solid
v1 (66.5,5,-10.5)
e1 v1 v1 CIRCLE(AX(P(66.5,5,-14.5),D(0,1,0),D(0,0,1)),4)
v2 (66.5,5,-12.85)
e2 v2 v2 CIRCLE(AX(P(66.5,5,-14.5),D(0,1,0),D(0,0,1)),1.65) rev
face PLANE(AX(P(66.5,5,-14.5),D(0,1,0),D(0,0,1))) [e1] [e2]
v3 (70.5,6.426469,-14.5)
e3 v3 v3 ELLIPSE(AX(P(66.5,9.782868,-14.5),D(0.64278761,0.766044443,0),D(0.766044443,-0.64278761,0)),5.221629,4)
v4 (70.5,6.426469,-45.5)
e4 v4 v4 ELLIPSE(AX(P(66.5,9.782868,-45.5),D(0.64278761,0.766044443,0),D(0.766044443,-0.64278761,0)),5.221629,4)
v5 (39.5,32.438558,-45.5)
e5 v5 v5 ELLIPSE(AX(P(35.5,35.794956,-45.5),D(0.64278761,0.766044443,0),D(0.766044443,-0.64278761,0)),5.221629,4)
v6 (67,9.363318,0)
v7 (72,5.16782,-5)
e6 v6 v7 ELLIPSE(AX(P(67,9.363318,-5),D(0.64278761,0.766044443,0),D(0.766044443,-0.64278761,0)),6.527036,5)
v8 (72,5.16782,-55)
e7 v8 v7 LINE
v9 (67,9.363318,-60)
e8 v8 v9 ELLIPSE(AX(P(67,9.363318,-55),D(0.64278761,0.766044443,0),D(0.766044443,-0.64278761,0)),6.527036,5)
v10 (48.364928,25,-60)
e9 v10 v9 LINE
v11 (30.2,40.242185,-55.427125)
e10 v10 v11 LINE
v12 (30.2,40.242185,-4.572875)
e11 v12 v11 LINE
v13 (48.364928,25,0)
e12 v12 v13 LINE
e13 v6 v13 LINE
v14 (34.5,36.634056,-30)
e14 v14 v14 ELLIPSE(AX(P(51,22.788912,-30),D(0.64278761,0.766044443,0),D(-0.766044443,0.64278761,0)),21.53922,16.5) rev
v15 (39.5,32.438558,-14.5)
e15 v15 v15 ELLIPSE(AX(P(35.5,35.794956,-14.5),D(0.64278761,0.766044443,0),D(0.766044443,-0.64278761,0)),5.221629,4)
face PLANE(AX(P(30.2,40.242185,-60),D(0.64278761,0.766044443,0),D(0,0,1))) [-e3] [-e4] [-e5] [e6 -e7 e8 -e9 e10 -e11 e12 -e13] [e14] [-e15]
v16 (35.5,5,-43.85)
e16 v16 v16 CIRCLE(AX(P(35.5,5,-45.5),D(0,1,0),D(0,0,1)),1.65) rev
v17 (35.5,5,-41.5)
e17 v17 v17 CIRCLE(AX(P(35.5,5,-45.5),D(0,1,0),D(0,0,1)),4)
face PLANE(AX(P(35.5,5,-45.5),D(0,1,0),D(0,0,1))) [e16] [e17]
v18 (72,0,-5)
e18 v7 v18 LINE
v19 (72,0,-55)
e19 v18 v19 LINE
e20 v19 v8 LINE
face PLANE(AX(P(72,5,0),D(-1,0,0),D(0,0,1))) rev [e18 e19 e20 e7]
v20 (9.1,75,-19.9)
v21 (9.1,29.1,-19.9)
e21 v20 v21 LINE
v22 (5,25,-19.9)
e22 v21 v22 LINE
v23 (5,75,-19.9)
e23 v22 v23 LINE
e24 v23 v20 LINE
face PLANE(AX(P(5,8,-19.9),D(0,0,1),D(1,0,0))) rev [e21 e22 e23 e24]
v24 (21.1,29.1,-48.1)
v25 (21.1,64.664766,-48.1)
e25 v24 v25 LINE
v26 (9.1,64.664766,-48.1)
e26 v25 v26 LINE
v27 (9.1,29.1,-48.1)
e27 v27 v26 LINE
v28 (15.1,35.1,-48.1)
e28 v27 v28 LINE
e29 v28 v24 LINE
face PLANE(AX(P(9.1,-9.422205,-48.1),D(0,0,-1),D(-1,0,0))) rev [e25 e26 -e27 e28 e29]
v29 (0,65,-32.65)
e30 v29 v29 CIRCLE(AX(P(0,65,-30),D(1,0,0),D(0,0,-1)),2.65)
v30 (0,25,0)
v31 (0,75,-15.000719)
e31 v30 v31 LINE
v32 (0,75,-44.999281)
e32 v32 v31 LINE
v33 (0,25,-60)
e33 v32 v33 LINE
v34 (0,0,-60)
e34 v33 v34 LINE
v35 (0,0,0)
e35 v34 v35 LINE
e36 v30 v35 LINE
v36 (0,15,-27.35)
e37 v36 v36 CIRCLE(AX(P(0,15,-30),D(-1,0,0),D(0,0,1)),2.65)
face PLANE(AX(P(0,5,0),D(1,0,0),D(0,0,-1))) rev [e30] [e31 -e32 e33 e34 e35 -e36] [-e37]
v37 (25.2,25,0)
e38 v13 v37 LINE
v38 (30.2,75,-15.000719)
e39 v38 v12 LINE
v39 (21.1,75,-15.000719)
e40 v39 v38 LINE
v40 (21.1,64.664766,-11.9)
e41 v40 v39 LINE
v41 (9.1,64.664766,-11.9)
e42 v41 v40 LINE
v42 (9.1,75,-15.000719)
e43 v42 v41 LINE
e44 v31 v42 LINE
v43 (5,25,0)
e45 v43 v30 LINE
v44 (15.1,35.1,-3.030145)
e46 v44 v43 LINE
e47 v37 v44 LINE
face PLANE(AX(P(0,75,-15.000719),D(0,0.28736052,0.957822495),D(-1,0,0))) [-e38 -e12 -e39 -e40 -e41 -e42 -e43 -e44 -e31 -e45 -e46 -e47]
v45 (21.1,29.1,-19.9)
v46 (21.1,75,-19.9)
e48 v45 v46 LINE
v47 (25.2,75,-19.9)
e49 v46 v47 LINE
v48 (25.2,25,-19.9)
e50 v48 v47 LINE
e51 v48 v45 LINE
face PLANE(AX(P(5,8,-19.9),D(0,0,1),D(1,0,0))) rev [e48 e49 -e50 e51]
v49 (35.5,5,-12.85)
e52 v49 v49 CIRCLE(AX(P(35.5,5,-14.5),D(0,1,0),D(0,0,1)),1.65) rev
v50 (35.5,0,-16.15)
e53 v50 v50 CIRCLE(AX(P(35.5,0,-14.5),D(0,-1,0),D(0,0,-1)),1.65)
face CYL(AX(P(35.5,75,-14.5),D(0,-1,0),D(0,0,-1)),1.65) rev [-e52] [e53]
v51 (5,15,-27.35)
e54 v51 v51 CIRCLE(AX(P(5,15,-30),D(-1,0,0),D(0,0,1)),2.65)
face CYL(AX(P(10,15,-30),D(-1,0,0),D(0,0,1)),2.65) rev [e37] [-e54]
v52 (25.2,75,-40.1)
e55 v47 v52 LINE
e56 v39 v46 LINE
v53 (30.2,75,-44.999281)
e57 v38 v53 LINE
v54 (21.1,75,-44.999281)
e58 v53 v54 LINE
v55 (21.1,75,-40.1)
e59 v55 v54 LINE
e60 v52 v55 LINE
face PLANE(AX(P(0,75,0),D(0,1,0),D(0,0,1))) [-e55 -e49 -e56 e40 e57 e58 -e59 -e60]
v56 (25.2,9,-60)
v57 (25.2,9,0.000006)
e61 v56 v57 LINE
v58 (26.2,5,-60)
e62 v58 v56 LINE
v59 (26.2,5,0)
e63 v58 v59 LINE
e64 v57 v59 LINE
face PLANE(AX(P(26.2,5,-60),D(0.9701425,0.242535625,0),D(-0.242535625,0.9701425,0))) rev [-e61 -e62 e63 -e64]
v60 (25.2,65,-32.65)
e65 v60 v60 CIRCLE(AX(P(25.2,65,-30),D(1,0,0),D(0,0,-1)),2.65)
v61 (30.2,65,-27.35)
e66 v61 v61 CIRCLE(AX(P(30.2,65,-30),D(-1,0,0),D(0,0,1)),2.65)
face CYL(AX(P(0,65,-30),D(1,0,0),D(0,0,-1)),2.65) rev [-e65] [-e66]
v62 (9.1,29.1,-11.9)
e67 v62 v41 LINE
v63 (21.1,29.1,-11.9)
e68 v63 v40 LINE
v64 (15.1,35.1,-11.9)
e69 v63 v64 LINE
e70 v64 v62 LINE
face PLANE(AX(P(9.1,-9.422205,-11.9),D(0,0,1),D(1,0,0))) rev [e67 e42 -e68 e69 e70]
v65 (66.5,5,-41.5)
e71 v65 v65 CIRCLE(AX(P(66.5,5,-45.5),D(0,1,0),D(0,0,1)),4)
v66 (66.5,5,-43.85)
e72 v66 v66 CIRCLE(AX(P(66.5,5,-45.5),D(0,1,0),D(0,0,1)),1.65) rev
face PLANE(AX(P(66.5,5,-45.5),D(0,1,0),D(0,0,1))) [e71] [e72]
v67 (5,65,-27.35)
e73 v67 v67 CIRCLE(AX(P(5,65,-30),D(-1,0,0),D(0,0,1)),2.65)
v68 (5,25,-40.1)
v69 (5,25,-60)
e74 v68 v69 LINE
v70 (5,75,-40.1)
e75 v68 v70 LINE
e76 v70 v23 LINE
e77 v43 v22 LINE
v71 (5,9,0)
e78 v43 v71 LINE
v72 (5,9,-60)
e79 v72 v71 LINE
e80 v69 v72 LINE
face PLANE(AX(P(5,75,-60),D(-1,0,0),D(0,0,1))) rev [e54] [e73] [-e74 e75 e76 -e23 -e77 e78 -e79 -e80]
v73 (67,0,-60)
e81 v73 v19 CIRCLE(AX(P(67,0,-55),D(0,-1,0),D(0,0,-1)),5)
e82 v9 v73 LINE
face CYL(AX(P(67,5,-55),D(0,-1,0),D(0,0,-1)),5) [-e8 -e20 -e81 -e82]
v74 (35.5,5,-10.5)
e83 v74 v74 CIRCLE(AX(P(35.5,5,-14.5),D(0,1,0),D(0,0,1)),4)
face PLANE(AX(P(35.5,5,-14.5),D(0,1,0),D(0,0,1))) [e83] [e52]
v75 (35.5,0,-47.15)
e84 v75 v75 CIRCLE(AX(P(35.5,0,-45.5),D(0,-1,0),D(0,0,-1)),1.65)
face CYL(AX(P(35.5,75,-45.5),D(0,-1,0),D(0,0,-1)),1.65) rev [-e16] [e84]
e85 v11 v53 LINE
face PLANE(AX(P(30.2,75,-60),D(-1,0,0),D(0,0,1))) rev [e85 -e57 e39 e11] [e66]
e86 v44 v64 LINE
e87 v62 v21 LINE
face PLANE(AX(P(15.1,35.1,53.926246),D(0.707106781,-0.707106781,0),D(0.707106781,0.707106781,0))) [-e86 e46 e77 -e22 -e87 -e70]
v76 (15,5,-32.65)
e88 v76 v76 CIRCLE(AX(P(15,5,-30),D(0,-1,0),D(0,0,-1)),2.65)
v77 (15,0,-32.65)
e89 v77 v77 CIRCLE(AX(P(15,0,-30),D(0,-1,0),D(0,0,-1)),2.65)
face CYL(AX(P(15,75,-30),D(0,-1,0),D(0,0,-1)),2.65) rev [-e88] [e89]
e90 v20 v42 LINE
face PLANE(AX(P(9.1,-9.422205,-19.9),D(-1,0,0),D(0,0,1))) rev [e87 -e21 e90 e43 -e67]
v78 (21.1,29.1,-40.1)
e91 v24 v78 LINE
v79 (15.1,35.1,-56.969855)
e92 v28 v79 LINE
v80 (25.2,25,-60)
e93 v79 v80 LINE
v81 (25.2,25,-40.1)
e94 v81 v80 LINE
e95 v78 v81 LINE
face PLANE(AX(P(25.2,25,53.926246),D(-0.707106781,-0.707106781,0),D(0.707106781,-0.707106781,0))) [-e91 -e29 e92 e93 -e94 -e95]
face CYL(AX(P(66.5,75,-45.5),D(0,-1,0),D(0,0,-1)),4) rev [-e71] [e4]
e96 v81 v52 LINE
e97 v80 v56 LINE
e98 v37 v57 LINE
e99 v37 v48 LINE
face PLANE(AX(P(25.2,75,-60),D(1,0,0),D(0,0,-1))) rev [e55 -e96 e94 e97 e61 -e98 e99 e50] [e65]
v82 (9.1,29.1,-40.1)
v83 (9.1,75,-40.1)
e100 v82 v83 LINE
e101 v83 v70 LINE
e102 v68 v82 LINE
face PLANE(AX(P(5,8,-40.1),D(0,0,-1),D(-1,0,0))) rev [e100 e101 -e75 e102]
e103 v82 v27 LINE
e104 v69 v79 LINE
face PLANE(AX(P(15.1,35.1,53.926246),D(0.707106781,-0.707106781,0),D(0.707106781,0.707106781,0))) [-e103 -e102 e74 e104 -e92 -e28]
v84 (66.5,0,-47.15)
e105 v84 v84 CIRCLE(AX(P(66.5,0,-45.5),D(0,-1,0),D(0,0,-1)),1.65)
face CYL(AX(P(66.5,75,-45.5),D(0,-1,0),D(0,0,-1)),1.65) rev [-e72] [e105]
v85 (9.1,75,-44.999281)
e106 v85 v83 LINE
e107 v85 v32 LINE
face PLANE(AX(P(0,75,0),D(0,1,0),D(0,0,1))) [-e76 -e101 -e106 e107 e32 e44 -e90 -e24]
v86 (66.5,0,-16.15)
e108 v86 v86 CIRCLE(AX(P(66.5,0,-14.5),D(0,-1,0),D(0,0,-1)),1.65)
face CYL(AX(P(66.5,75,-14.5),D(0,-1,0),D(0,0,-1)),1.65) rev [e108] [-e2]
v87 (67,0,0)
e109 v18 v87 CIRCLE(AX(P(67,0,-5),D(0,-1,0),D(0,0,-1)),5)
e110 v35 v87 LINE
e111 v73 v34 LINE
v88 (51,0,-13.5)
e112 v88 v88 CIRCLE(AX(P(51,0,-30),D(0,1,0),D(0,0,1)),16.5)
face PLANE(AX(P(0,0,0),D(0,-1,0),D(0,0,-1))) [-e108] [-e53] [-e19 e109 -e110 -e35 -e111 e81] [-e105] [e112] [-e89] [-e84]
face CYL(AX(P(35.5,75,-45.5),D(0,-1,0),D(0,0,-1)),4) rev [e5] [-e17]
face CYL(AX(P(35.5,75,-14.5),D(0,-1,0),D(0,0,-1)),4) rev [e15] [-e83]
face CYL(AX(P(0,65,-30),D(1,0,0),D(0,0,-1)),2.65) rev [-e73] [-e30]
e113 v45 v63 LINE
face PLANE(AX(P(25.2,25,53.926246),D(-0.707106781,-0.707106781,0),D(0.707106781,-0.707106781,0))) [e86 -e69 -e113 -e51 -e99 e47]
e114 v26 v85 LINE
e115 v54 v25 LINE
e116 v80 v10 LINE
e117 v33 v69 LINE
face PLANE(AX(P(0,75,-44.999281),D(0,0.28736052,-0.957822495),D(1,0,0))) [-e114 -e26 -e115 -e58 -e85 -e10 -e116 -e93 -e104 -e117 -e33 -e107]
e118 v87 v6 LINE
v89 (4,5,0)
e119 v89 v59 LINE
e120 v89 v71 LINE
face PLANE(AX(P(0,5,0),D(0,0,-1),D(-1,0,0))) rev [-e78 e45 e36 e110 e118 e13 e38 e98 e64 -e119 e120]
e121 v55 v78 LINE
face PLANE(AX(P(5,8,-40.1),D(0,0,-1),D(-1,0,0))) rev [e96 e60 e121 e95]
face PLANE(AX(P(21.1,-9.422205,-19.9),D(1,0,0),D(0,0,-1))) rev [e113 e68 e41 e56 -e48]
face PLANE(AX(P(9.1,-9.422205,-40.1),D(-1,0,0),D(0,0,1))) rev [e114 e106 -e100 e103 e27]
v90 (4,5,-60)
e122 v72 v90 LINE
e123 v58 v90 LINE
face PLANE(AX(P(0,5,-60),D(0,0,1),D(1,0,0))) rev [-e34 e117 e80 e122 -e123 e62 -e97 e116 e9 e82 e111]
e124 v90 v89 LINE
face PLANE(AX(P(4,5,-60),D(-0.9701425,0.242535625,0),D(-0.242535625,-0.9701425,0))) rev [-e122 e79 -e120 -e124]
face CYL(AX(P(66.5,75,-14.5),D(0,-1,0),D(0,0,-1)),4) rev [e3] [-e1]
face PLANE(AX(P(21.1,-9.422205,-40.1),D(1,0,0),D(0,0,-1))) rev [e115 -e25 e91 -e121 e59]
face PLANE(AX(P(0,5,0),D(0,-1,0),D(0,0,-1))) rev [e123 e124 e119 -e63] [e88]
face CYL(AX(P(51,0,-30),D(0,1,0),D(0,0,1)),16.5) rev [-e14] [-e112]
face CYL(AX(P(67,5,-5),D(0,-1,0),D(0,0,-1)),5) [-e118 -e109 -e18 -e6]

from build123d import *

# Parameters (mm, degrees)
SKETCH1_W               = 72
SKETCH1_H               = 60
BOSS_EXTRUDE1_DEPTH     = 5
SKETCH2_W               = 5
SKETCH2_H               = 60
BOSS_EXTRUDE2_DEPTH     = 70
SKETCH3_W               = 5
SKETCH3_H               = 60
BOSS_EXTRUDE3_DEPTH     = 70
BOSS_EXTRUDE4_DEPTH     = 60
CHAMFER1_SIZE           = 42
CHAMFER1_SIZE_2         = 35.242184509
CHAMFER2_SIZE           = 15.000718891
CHAMFER2_SIZE_2         = 50
SKETCH12_W              = 20.2
SKETCH12_H              = 20.2
CUT_EXTRUDE8_DEPTH      = 67
CUT_EXTRUDE1_DEPTH      = 117.978630527
CUT_EXTRUDE1_DEPTH_BACK = 117.978630527
SKETCH5_R               = 16.5
SKETCH6_R               = 1.65
CUT_EXTRUDE2_DEPTH      = 121.037494142
SKETCH7_R               = 4
CUT_EXTRUDE4_DEPTH      = 117.978630527
CUT_EXTRUDE5_DEPTH      = 105.748460609
CUT_EXTRUDE5_DEPTH_BACK = 105.748460609
SKETCH8_R               = 2.65
CUT_EXTRUDE6_DEPTH      = 121.037494142
CUT_EXTRUDE6_DEPTH_BACK = 121.037494142
SKETCH9_R               = 2.65
FILLET1_R               = 5
SKETCH10_R              = 2.65
CUT_EXTRUDE7_DEPTH      = 10
CUT_EXTRUDE9_DEPTH      = 121.037494142
CUT_EXTRUDE9_DEPTH_BACK = 121.037494142
CUT_EXTRUDE10_REACH     = 122.037
SKETCH14_W              = 12
SKETCH14_H              = 8


with BuildPart() as part:
    # Sketch1 → Boss-Extrude1 (new body)
    with BuildSketch(Plane(origin=(0, 0, 0), x_dir=(1, 0, 0), z_dir=(0, 1, 0))):
        with Locations((36, 30)):
            Rectangle(SKETCH1_W, SKETCH1_H)
    extrude(amount=BOSS_EXTRUDE1_DEPTH)

    # Sketch2 → Boss-Extrude2 (add)
    with BuildSketch(Plane(origin=(0, 5, 0), x_dir=(1, 0, 0), z_dir=(0, 1, 0))):
        with Locations((2.5, 30)):
            Rectangle(SKETCH2_W, SKETCH2_H)
    extrude(amount=BOSS_EXTRUDE2_DEPTH)

    # Sketch3 → Boss-Extrude3 (add)
    with BuildSketch(Plane(origin=(0, 5, 0), x_dir=(1, 0, 0), z_dir=(0, 1, 0))):
        with Locations((27.7, 30)):
            Rectangle(SKETCH3_W, SKETCH3_H)
    extrude(amount=BOSS_EXTRUDE3_DEPTH)

    # Sketch11 → Boss-Extrude4 (add)
    with BuildSketch(Plane(origin=(0, 0, -60), x_dir=(-1, 0, 0), z_dir=(0, 0, -1))):
        Polygon((-25.2, 25), (-15.1, 35.1), (-5, 25), (-5, 75), (-25.2, 75), align=None)
    extrude(amount=-BOSS_EXTRUDE4_DEPTH)

    # Chamfer1
    # the kernel refuses this chamfer: 42, 35.242184509 mm, written as the material it adds along each edge
    with BuildSketch(Plane(origin=(30.2, 5, -60), x_dir=(0.9996889667359942, -0.02493932209023436, 0), z_dir=(0, 0, 1))) as chamfer1_piece_1_section:
        Polygon((CHAMFER1_SIZE * 0.999688966736, CHAMFER1_SIZE * 0.0249393220902), (-CHAMFER1_SIZE_2 * 0.0249393220905, CHAMFER1_SIZE_2 * 0.999688966749), (0, 0), align=None)
    chamfer1_piece_1 = extrude(amount=60, mode=Mode.PRIVATE)
    chamfer1_piece_1 = split(chamfer1_piece_1, bisect_by=Plane(origin=(72, 16.573415306, -30), z_dir=(-1, 0, 0)), keep=Keep.TOP, mode=Mode.PRIVATE)
    add(chamfer1_piece_1)

    # Chamfer2
    # the kernel refuses this chamfer: 50, 15.000718891 mm, written as the material it takes off along each edge
    with BuildSketch(Plane(origin=(159.997065138, 75, -60), x_dir=(0, 0.12207157319780576, 0.9925213000318999), z_dir=(-1, 0, 0))) as chamfer2_piece_1:
        Polygon((CHAMFER2_SIZE * 0.99252130002, -CHAMFER2_SIZE * 0.122071573196), (-CHAMFER2_SIZE_2 * 0.122071573198, -CHAMFER2_SIZE_2 * 0.992521300032), (0, 0), align=None)
    extrude(amount=289.794130277, mode=Mode.SUBTRACT)
    with BuildSketch(Plane(origin=(159.997065138, 75, 0), x_dir=(0, 0.12207157319780576, -0.9925213000318999), z_dir=(-1, 0, 0))) as chamfer2_piece_2:
        Polygon((CHAMFER2_SIZE * 0.99252130002, CHAMFER2_SIZE * 0.122071573196), (-CHAMFER2_SIZE_2 * 0.122071573198, CHAMFER2_SIZE_2 * 0.992521300032), (0, 0), align=None)
    extrude(amount=289.794130277, mode=Mode.SUBTRACT)

    # Sketch12 → Cut-Extrude8 (cut)
    with BuildSketch(Plane(origin=(0, 75, 0), x_dir=(1, 0, 0), z_dir=(0, 1, 0))):
        with Locations((15.1, 30)):
            Rectangle(SKETCH12_W, SKETCH12_H)
    extrude(amount=-CUT_EXTRUDE8_DEPTH, mode=Mode.SUBTRACT)

    # Sketch5 → Cut-Extrude1 (cut, two sides: drawn at the far end of the back side and taken through both)
    with BuildSketch(Plane(origin=(0, 5, 0), x_dir=(1, 0, 0), z_dir=(0, 1, 0)).offset(-CUT_EXTRUDE1_DEPTH_BACK)):
        with Locations(Location((51, 30, 0), (0, 0, 270))):
            Circle(SKETCH5_R)
    extrude(amount=CUT_EXTRUDE1_DEPTH + CUT_EXTRUDE1_DEPTH_BACK, mode=Mode.SUBTRACT)

    # Sketch6 → Cut-Extrude2 (cut, through all)
    with BuildSketch(Plane.XZ):
        with Locations(Location((66.5, -14.5, 0), (0, 0, 270))):
            Circle(SKETCH6_R)
        with Locations(Location((66.5, -45.5, 0), (0, 0, 270))):
            Circle(SKETCH6_R)
        with Locations(Location((35.5, -45.5, 0), (0, 0, 270))):
            Circle(SKETCH6_R)
        with Locations(Location((35.5, -14.5, 0), (0, 0, 270))):
            Circle(SKETCH6_R)
    extrude(amount=-CUT_EXTRUDE2_DEPTH, mode=Mode.SUBTRACT)

    # Sketch7 → Cut-Extrude4 (cut, through all)
    with BuildSketch(Plane(origin=(0, 5, 0), x_dir=(1, 0, 0), z_dir=(0, 1, 0))):
        with Locations((66.5, 45.5)):
            Circle(SKETCH7_R)
        with Locations((66.5, 14.5)):
            Circle(SKETCH7_R)
        with Locations((35.5, 14.5)):
            Circle(SKETCH7_R)
        with Locations((35.5, 45.5)):
            Circle(SKETCH7_R)
    extrude(amount=CUT_EXTRUDE4_DEPTH, mode=Mode.SUBTRACT)

    # Sketch8 → Cut-Extrude5 (cut, two sides: drawn at the far end of the back side and taken through both)
    with BuildSketch(Plane(origin=(30.2, 0, 0), x_dir=(0, 0, -1), z_dir=(1, 0, 0)).offset(-CUT_EXTRUDE5_DEPTH_BACK)):
        with Locations((30, 65)):
            Circle(SKETCH8_R)
    extrude(amount=CUT_EXTRUDE5_DEPTH + CUT_EXTRUDE5_DEPTH_BACK, mode=Mode.SUBTRACT)

    # Sketch9 → Cut-Extrude6 (cut, two sides: drawn at the far end of the back side and taken through both)
    with BuildSketch(Plane.XZ.offset(-CUT_EXTRUDE6_DEPTH_BACK)):
        with Locations(Location((15, -30, 0), (0, 0, 270))):
            Circle(SKETCH9_R)
    extrude(amount=CUT_EXTRUDE6_DEPTH + CUT_EXTRUDE6_DEPTH_BACK, mode=Mode.SUBTRACT)

    # Fillet1
    fillet1_edges = [part.edges().sort_by_distance(p)[0] for p in [
        (72, 2.583909963, -60),
        (72, 2.583909963, 0),
    ]]
    fillet(fillet1_edges, radius=FILLET1_R)

    # Sketch10 → Cut-Extrude7 (cut)
    with BuildSketch(Plane.ZY):
        with Locations((-30, 15)):
            Circle(SKETCH10_R)
    extrude(amount=-CUT_EXTRUDE7_DEPTH, mode=Mode.SUBTRACT)

    # Sketch13 → Cut-Extrude9 (cut, two sides: drawn at the far end of the back side and taken through both)
    with BuildSketch(Plane.XY.offset(-CUT_EXTRUDE9_DEPTH_BACK)):
        Polygon((5, 5), (4, 5), (5, 9), align=None)
        Polygon((25.2, 5), (26.2, 5), (25.2, 9), align=None)
    extrude(amount=CUT_EXTRUDE9_DEPTH + CUT_EXTRUDE9_DEPTH_BACK, mode=Mode.SUBTRACT)

    # Cut-Extrude10: up to this face of the body (flat: up to its plane)
    cut_extrude10_end = Plane(part.part.faces().sort_by_distance((15.1, 5, -59.366909169))[0])
    # Sketch14 → Cut-Extrude10 (cut, up to the picked face)
    with BuildSketch(Plane(origin=(0, 75, 0), x_dir=(1, 0, 0), z_dir=(0, 1, 0)), mode=Mode.PRIVATE) as cut_extrude10_sk1:
        with Locations((15.1, 44.1)):
            Rectangle(SKETCH14_W, SKETCH14_H)
    cut_extrude10_tool1 = split(extrude(cut_extrude10_sk1.sketch, amount=-CUT_EXTRUDE10_REACH, mode=Mode.PRIVATE), bisect_by=cut_extrude10_end, keep=Keep.BOTH, mode=Mode.PRIVATE)
    # Sketch14 → Cut-Extrude10 (cut, up to the picked face)
    with BuildSketch(Plane(origin=(0, 75, 0), x_dir=(1, 0, 0), z_dir=(0, 1, 0)), mode=Mode.PRIVATE) as cut_extrude10_sk2:
        with Locations((15.1, 15.9)):
            Rectangle(SKETCH14_W, SKETCH14_H)
    cut_extrude10_tool2 = split(extrude(cut_extrude10_sk2.sketch, amount=-CUT_EXTRUDE10_REACH, mode=Mode.PRIVATE), bisect_by=cut_extrude10_end, keep=Keep.BOTH, mode=Mode.PRIVATE)
    add(cut_extrude10_tool1.solids().sort_by(Axis((15.1, 75, -44.1), (0, -1, 0)))[0], mode=Mode.SUBTRACT)
    add(cut_extrude10_tool2.solids().sort_by(Axis((15.1, 75, -15.9), (0, -1, 0)))[0], mode=Mode.SUBTRACT)


solid = part.part
